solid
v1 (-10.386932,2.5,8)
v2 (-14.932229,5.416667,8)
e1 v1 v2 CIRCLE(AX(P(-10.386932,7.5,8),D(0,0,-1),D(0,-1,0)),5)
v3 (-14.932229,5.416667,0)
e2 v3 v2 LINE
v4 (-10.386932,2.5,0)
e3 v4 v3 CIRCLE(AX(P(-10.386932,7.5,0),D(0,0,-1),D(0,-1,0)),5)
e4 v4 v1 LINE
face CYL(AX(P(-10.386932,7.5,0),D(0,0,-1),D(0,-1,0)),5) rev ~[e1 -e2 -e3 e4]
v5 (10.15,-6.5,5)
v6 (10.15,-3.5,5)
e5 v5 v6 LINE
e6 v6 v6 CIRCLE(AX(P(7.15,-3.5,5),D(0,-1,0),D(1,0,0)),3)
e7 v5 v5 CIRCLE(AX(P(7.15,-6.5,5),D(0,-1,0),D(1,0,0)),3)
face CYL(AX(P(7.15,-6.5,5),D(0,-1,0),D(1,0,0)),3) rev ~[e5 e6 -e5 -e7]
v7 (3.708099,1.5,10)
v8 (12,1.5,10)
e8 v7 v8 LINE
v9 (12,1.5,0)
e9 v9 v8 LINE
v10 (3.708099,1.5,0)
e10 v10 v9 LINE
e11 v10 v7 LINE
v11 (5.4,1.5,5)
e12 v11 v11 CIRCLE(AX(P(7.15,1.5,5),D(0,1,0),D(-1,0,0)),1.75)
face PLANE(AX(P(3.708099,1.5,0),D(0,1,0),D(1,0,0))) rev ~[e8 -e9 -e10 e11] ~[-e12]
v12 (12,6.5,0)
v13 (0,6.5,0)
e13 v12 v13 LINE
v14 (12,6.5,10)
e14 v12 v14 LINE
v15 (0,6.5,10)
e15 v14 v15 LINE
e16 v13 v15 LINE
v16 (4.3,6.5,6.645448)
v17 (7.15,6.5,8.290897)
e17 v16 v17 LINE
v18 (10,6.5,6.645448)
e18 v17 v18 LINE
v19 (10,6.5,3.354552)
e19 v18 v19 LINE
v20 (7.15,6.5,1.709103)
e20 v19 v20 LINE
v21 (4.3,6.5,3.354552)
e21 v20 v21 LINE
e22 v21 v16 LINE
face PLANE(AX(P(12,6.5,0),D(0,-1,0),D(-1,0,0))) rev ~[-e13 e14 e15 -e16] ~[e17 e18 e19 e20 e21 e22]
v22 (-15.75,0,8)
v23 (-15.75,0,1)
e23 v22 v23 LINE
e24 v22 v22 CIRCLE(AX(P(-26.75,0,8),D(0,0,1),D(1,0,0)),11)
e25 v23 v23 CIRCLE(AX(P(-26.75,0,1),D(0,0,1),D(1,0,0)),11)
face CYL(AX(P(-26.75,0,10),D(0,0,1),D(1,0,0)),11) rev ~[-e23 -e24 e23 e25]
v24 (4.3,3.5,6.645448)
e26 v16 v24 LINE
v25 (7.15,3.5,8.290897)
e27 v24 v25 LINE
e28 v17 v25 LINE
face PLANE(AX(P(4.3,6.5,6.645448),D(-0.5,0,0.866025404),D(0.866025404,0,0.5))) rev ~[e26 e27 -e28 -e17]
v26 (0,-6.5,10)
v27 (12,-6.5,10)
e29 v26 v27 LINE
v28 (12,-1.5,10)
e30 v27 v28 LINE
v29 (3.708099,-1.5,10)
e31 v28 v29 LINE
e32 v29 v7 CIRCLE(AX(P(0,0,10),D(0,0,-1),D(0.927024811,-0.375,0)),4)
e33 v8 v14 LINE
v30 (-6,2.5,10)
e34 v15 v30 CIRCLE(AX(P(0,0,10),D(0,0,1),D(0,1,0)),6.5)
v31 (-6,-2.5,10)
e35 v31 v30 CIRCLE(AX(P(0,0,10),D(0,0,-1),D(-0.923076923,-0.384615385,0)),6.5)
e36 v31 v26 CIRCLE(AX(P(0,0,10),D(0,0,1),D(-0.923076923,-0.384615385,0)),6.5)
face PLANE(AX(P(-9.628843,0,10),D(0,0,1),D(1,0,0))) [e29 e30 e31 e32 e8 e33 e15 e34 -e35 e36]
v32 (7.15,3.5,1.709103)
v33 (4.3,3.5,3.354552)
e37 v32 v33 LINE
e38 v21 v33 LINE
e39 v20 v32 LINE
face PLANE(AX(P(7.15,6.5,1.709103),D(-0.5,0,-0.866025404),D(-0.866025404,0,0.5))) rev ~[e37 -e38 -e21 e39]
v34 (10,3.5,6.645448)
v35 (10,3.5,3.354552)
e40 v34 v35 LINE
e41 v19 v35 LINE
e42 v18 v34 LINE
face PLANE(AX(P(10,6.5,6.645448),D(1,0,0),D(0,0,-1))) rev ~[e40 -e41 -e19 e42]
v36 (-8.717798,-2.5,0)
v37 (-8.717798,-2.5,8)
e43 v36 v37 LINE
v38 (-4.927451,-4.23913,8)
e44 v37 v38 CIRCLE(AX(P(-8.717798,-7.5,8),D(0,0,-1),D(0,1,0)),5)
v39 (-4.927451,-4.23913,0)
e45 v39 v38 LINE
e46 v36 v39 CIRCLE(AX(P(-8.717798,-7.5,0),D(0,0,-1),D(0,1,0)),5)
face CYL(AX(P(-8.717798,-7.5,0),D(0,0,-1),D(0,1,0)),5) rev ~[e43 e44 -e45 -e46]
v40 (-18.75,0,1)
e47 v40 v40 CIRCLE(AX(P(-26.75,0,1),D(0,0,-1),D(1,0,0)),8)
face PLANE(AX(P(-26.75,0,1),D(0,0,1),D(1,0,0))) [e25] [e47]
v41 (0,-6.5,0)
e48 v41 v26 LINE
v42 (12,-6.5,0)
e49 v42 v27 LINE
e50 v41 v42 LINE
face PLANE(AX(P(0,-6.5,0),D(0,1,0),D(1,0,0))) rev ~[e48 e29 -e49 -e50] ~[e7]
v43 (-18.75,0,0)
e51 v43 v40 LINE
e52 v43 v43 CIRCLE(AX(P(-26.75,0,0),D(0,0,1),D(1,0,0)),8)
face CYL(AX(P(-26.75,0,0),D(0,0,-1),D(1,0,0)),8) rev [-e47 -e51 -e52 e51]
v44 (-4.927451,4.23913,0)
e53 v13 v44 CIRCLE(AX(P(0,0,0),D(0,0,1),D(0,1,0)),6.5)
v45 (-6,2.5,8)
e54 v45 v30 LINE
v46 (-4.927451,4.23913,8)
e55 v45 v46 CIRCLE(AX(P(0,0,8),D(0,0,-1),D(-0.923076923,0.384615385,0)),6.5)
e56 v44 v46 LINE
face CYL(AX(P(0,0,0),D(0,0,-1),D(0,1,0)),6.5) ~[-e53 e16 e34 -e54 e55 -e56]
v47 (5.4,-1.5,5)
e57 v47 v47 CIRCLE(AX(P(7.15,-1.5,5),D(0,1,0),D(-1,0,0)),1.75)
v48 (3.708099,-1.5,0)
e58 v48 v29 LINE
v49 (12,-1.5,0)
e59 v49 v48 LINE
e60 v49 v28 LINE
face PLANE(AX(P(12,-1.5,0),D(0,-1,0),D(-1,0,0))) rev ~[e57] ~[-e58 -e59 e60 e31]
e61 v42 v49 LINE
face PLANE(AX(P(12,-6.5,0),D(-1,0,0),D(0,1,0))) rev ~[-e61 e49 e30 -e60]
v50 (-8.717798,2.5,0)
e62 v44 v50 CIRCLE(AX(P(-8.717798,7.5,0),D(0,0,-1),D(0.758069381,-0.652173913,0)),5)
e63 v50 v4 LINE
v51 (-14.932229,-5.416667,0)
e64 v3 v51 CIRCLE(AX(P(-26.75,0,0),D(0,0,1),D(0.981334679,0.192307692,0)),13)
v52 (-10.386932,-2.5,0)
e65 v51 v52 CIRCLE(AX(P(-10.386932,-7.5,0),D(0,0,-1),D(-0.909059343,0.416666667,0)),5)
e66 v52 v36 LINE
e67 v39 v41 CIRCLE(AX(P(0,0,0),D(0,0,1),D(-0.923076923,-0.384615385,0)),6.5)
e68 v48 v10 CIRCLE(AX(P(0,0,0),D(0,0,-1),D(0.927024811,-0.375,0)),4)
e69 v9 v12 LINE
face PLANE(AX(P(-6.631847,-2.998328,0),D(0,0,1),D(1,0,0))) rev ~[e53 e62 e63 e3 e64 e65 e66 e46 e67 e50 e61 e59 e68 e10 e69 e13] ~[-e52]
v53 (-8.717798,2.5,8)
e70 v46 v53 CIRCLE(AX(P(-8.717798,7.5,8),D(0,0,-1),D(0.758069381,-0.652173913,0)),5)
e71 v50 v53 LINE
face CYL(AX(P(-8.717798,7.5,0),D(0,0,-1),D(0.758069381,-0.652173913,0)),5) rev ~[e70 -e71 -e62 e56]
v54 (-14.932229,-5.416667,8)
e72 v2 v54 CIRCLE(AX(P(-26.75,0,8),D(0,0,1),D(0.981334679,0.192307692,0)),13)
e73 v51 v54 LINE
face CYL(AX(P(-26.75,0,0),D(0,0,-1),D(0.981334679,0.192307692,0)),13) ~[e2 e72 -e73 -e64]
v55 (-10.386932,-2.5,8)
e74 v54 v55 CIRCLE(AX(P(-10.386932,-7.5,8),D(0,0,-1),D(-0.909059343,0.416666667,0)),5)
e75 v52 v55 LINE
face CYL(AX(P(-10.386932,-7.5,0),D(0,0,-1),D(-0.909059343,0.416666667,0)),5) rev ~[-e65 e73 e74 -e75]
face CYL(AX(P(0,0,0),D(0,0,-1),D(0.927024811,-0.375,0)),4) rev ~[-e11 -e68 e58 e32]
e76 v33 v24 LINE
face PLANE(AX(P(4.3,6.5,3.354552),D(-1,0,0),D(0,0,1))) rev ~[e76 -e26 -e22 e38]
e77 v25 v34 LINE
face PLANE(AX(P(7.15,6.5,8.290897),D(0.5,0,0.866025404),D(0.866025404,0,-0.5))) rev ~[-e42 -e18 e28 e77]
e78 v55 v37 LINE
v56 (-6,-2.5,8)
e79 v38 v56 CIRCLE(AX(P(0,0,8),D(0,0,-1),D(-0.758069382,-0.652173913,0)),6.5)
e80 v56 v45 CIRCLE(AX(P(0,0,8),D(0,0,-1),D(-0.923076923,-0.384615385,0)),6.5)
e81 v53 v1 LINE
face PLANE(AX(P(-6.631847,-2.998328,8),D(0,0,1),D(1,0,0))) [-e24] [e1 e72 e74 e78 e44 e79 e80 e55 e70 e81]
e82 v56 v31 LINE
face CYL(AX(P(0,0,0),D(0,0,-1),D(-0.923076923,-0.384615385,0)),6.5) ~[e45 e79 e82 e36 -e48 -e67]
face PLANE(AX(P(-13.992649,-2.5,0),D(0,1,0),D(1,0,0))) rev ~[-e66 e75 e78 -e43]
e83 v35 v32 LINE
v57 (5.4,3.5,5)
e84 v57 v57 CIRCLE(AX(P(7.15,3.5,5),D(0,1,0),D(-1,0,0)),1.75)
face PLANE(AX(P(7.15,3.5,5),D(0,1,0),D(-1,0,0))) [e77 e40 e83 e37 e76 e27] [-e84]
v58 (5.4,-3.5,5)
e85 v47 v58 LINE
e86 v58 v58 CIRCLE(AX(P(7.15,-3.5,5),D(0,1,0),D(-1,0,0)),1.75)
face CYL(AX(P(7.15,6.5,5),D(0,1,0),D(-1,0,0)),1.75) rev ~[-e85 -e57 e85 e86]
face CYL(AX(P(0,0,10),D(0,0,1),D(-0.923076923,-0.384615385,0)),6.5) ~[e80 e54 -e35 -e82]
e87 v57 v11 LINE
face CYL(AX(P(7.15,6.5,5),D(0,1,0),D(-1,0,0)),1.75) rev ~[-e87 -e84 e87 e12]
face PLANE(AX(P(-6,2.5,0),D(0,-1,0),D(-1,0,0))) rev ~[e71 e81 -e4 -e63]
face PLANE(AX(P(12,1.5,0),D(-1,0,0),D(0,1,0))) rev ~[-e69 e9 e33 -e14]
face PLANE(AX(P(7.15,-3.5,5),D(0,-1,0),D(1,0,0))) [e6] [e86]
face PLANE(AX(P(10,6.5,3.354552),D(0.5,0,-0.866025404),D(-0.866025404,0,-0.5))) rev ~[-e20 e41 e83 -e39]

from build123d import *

# Parameters (mm, degrees)
F0_R         = 8
F1_DEPTH     = 10
F2_R         = 11
F3_DEPTH     = 9
F5_DEPTH     = 2
F7_DEPTH     = 3
F8_R         = 1.75
F9_DEPTH     = 19.501
F10_R        = 3
F11_DEPTH    = 3
F12_T1_DEPTH = 8


# Not quite as in the source:
# - a fillet or chamfer that OpenCascade refuses, or shapes differently, is made with other operations: its cross-section is extruded or revolved along the edge and cut away or added


with BuildPart() as f1:
    # F0 (on Top) → F1 (new body)
    with BuildSketch(Plane.XY):
        with BuildLine():
            ThreePointArc((3.7080992435, -1.5), (-4, 0), (3.7080992435, 1.5))
            Line((3.7080992435, 1.5), (12, 1.5))
            Line((12, 1.5), (12, 6.5))
            Line((12, 6.5), (0, 6.5))
            ThreePointArc((0, 6.5), (-3.6055512755, 5.4083269132), (-6, 2.5))
            Line((-6, 2.5), (-13.9926491778, 2.5))
            ThreePointArc((-13.9926491778, 2.5), (-39.75, 0), (-13.9926491778, -2.5))
            Line((-13.9926491778, -2.5), (-6, -2.5))
            ThreePointArc((-6, -2.5), (-3.6055512755, -5.4083269132), (0, -6.5))
            Line((0, -6.5), (12, -6.5))
            Line((12, -6.5), (12, -1.5))
            Line((12, -1.5), (3.7080992435, -1.5))
        make_face()
        with Locations((-26.75, 0)):
            Circle(F0_R, mode=Mode.SUBTRACT)
    extrude(amount=F1_DEPTH)

    # F2 (on face) → F3 (cut)
    with BuildSketch(Plane.XY.offset(10)):
        with Locations((-26.75, 0)):
            Circle(F2_R)
    extrude(amount=-F3_DEPTH, mode=Mode.SUBTRACT)

    # F4 (on face) → F5 (cut)
    with BuildSketch(Plane.XY.offset(10)):
        with BuildLine():
            Line((-6, 2.5), (-13.9926491778, 2.5))
            ThreePointArc((-13.9926491778, 2.5), (-39.75, 0), (-13.9926491778, -2.5))
            Line((-13.9926491778, -2.5), (-6, -2.5))
            ThreePointArc((-6, -2.5), (-6.5, 0), (-6, 2.5))
        make_face()
    extrude(amount=-F5_DEPTH, mode=Mode.SUBTRACT)

    # F6 (on face) → F7 (cut)
    with BuildSketch(Plane(origin=(0, 6.5, 0), x_dir=(-1, 0, 0), z_dir=(0, 1, 0))):
        Polygon((-10, 6.6454482672), (-10, 3.3545517328), (-7.15, 1.7091034656), (-4.3, 3.3545517328), (-4.3, 6.6454482672), (-7.15, 8.2908965344), align=None)
    extrude(amount=-F7_DEPTH, mode=Mode.SUBTRACT)

    # F8 (on face) → F9 (cut, through all)
    with BuildSketch(Plane(origin=(0, 6.5, 0), x_dir=(-1, 0, 0), z_dir=(0, 1, 0))):
        with Locations((-7.15, 5)):
            Circle(F8_R)
    extrude(amount=-F9_DEPTH, mode=Mode.SUBTRACT)

    # F10 (on face) → F11 (cut)
    with BuildSketch(Plane.XZ.offset(6.5)):
        with Locations((7.15, 5)):
            Circle(F10_R)
    extrude(amount=-F11_DEPTH, mode=Mode.SUBTRACT)

    # F12: fillet of radius 5 on 4 edges, made by hand

    # F12_s2 → F12_t1 (join)
    with BuildSketch(Plane.XY):
        with BuildLine():
            ThreePointArc((-8.7177978871, -2.5), (-6.6326537465, -2.9555337043), (-4.9274509797, -4.2391304348))
            ThreePointArc((-4.9274509797, -4.2391304348), (-5.5324894844, -3.4119730516), (-6, -2.5))
            Line((-6, -2.5), (-8.7177978871, -2.5))
        make_face()
        with BuildLine():
            ThreePointArc((-14.9322285425, -5.4166666667), (-13.0872404524, -3.2918729423), (-10.386931828, -2.5))
            Line((-10.386931828, -2.5), (-13.9926491778, -2.5))
            ThreePointArc((-13.9926491778, -2.5), (-14.3762012754, -3.9861140379), (-14.9322285425, -5.4166666667))
        make_face()
        with BuildLine():
            ThreePointArc((-10.386931828, 2.5), (-13.0872404524, 3.2918729423), (-14.9322285425, 5.4166666667))
            ThreePointArc((-14.9322285425, 5.4166666667), (-14.3762012754, 3.9861140379), (-13.9926491778, 2.5))
            Line((-13.9926491778, 2.5), (-10.386931828, 2.5))
        make_face()
        with BuildLine():
            ThreePointArc((-4.9274509797, 4.2391304348), (-6.6326537465, 2.9555337043), (-8.7177978871, 2.5))
            Line((-8.7177978871, 2.5), (-6, 2.5))
            ThreePointArc((-6, 2.5), (-5.5324894844, 3.4119730516), (-4.9274509797, 4.2391304348))
        make_face()
    extrude(amount=F12_T1_DEPTH)


solid = f1.part
